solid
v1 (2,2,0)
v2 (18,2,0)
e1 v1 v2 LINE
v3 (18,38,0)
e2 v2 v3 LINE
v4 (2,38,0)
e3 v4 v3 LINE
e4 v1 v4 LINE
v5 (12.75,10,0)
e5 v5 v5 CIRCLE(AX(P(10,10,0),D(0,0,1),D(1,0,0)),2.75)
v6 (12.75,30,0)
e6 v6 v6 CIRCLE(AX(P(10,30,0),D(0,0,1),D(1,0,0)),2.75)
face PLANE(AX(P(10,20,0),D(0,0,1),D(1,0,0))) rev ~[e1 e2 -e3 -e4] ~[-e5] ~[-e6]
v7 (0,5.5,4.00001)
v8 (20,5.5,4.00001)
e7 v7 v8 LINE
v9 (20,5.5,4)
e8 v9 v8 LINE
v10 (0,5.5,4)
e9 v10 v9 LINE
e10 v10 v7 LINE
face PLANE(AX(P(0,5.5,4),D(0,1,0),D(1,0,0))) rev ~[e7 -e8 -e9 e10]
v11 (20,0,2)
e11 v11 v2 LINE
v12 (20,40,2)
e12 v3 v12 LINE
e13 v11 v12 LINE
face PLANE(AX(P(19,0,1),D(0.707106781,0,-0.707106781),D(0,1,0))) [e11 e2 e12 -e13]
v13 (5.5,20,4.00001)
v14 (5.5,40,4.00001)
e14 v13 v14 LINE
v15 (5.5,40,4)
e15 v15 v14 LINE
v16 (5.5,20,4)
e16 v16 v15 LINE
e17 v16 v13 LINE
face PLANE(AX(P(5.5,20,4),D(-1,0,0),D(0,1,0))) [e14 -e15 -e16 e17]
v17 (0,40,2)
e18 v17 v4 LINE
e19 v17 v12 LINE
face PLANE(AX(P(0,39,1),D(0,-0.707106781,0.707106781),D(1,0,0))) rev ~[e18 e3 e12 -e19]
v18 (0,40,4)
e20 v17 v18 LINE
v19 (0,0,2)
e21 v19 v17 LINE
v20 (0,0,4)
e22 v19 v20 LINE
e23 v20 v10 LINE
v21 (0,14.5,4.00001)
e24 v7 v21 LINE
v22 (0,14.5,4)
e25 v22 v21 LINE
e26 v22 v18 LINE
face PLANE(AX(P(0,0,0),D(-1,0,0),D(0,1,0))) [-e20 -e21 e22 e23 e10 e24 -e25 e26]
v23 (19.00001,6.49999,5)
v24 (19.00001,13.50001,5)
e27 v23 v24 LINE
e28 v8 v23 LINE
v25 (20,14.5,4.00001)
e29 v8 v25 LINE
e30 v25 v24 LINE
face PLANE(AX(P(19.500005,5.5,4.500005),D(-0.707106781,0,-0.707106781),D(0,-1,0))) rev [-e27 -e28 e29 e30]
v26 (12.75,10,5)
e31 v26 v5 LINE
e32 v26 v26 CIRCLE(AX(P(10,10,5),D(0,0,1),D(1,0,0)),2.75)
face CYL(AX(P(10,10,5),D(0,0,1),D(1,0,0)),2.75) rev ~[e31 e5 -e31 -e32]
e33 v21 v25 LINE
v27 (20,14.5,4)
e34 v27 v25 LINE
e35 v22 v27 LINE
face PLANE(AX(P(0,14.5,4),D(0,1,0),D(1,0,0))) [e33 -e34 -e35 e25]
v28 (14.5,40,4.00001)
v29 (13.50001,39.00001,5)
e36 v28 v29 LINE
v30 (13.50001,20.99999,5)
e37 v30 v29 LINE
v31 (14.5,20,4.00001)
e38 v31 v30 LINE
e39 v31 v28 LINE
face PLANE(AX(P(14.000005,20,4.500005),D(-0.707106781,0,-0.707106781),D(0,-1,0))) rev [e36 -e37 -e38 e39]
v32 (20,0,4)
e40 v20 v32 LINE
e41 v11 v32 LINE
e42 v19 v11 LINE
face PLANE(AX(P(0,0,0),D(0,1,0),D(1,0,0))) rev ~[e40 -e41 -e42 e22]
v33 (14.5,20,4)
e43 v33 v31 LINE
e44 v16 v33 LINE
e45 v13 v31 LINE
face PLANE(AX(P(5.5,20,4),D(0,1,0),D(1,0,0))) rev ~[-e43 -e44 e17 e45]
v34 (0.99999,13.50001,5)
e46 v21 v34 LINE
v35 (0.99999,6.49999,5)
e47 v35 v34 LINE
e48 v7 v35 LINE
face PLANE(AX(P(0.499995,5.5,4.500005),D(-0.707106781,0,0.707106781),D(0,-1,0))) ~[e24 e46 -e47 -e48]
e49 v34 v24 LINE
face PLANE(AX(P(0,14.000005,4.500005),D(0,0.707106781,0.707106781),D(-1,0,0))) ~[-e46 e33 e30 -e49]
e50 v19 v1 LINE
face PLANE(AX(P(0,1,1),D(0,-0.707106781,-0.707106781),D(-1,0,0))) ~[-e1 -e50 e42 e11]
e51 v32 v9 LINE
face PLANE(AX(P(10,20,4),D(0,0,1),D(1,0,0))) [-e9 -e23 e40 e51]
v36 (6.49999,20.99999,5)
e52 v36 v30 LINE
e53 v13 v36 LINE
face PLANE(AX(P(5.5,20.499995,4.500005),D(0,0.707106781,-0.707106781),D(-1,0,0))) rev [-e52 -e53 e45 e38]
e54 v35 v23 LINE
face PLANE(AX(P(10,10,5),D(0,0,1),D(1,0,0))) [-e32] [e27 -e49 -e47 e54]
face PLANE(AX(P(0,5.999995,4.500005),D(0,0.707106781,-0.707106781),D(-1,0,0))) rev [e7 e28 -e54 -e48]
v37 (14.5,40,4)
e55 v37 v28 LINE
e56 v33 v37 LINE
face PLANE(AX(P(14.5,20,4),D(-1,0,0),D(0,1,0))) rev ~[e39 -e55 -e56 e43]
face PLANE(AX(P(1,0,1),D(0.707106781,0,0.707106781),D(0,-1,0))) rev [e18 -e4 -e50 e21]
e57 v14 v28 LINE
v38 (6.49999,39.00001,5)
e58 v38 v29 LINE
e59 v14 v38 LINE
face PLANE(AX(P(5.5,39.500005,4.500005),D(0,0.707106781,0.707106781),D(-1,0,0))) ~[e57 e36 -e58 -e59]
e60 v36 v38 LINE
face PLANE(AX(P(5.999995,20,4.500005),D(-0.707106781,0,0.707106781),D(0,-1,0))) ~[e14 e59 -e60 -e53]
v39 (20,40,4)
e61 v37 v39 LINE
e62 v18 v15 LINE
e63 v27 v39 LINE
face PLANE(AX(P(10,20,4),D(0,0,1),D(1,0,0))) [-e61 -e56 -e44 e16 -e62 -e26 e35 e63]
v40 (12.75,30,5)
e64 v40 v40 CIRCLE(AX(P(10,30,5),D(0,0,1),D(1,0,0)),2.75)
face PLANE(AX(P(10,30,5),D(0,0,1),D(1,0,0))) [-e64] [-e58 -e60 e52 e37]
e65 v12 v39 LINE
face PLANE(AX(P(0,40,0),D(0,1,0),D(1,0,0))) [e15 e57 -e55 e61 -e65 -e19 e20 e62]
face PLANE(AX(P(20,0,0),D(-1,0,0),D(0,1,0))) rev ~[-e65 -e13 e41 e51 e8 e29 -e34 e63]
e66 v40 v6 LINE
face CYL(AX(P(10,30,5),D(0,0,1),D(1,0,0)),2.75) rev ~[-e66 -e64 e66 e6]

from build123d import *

# Parameters (mm, degrees)
F0_W     = 20
F0_H     = 40
F1_DEPTH = 4
F2_W     = 9
F2_H     = 20
F2_W_2   = 20
F2_H_2   = 9
F3_DEPTH = 1
F4_SIZE  = 0.99999
F5_R     = 2.75
F6_DEPTH = 5.001
F7_SIZE  = 2


# Not quite as in the source:
# - a fillet or chamfer is up to 0.001 mm smaller than in the source, because OpenCascade refuses the exact size


with BuildPart() as f1:
    # F0 (on Top) → F1 (new body)
    with BuildSketch(Plane.XY):
        with Locations((10, 20)):
            Rectangle(F0_W, F0_H)
    extrude(amount=F1_DEPTH)

    # F2 (on face) → F3 (join)
    with BuildSketch(Plane.XY.offset(4)):
        with Locations((10, 30)):
            Rectangle(F2_W, F2_H)
        with Locations((10, 10)):
            Rectangle(F2_W_2, F2_H_2)
    extrude(amount=F3_DEPTH)

    # F4 (size 1 in the source; OpenCascade refuses exactly that, so slightly less here)
    f4_edges = [f1.edges().sort_by_distance(p)[0] for p in [
        (10, 40, 5),
        (5.5, 30, 5),
        (10, 20, 5),
        (14.5, 30, 5),
        (10, 14.5, 5),
        (0, 10, 5),
        (10, 5.5, 5),
        (20, 10, 5),
    ]]
    chamfer(f4_edges, length=F4_SIZE)

    # F5 (on face) → F6 (cut, through all)
    with BuildSketch(Plane.XY.offset(5)):
        with Locations((10, 30)):
            Circle(F5_R)
        with Locations((10, 10)):
            Circle(F5_R)
    extrude(amount=-F6_DEPTH, mode=Mode.SUBTRACT)

    # F7
    f7_edges = [f1.edges().sort_by_distance(p)[0] for p in [
        (0, 20, 0),
        (10, 0, 0),
        (20, 20, 0),
        (10, 40, 0),
    ]]
    chamfer(f7_edges, length=F7_SIZE)


solid = f1.part
